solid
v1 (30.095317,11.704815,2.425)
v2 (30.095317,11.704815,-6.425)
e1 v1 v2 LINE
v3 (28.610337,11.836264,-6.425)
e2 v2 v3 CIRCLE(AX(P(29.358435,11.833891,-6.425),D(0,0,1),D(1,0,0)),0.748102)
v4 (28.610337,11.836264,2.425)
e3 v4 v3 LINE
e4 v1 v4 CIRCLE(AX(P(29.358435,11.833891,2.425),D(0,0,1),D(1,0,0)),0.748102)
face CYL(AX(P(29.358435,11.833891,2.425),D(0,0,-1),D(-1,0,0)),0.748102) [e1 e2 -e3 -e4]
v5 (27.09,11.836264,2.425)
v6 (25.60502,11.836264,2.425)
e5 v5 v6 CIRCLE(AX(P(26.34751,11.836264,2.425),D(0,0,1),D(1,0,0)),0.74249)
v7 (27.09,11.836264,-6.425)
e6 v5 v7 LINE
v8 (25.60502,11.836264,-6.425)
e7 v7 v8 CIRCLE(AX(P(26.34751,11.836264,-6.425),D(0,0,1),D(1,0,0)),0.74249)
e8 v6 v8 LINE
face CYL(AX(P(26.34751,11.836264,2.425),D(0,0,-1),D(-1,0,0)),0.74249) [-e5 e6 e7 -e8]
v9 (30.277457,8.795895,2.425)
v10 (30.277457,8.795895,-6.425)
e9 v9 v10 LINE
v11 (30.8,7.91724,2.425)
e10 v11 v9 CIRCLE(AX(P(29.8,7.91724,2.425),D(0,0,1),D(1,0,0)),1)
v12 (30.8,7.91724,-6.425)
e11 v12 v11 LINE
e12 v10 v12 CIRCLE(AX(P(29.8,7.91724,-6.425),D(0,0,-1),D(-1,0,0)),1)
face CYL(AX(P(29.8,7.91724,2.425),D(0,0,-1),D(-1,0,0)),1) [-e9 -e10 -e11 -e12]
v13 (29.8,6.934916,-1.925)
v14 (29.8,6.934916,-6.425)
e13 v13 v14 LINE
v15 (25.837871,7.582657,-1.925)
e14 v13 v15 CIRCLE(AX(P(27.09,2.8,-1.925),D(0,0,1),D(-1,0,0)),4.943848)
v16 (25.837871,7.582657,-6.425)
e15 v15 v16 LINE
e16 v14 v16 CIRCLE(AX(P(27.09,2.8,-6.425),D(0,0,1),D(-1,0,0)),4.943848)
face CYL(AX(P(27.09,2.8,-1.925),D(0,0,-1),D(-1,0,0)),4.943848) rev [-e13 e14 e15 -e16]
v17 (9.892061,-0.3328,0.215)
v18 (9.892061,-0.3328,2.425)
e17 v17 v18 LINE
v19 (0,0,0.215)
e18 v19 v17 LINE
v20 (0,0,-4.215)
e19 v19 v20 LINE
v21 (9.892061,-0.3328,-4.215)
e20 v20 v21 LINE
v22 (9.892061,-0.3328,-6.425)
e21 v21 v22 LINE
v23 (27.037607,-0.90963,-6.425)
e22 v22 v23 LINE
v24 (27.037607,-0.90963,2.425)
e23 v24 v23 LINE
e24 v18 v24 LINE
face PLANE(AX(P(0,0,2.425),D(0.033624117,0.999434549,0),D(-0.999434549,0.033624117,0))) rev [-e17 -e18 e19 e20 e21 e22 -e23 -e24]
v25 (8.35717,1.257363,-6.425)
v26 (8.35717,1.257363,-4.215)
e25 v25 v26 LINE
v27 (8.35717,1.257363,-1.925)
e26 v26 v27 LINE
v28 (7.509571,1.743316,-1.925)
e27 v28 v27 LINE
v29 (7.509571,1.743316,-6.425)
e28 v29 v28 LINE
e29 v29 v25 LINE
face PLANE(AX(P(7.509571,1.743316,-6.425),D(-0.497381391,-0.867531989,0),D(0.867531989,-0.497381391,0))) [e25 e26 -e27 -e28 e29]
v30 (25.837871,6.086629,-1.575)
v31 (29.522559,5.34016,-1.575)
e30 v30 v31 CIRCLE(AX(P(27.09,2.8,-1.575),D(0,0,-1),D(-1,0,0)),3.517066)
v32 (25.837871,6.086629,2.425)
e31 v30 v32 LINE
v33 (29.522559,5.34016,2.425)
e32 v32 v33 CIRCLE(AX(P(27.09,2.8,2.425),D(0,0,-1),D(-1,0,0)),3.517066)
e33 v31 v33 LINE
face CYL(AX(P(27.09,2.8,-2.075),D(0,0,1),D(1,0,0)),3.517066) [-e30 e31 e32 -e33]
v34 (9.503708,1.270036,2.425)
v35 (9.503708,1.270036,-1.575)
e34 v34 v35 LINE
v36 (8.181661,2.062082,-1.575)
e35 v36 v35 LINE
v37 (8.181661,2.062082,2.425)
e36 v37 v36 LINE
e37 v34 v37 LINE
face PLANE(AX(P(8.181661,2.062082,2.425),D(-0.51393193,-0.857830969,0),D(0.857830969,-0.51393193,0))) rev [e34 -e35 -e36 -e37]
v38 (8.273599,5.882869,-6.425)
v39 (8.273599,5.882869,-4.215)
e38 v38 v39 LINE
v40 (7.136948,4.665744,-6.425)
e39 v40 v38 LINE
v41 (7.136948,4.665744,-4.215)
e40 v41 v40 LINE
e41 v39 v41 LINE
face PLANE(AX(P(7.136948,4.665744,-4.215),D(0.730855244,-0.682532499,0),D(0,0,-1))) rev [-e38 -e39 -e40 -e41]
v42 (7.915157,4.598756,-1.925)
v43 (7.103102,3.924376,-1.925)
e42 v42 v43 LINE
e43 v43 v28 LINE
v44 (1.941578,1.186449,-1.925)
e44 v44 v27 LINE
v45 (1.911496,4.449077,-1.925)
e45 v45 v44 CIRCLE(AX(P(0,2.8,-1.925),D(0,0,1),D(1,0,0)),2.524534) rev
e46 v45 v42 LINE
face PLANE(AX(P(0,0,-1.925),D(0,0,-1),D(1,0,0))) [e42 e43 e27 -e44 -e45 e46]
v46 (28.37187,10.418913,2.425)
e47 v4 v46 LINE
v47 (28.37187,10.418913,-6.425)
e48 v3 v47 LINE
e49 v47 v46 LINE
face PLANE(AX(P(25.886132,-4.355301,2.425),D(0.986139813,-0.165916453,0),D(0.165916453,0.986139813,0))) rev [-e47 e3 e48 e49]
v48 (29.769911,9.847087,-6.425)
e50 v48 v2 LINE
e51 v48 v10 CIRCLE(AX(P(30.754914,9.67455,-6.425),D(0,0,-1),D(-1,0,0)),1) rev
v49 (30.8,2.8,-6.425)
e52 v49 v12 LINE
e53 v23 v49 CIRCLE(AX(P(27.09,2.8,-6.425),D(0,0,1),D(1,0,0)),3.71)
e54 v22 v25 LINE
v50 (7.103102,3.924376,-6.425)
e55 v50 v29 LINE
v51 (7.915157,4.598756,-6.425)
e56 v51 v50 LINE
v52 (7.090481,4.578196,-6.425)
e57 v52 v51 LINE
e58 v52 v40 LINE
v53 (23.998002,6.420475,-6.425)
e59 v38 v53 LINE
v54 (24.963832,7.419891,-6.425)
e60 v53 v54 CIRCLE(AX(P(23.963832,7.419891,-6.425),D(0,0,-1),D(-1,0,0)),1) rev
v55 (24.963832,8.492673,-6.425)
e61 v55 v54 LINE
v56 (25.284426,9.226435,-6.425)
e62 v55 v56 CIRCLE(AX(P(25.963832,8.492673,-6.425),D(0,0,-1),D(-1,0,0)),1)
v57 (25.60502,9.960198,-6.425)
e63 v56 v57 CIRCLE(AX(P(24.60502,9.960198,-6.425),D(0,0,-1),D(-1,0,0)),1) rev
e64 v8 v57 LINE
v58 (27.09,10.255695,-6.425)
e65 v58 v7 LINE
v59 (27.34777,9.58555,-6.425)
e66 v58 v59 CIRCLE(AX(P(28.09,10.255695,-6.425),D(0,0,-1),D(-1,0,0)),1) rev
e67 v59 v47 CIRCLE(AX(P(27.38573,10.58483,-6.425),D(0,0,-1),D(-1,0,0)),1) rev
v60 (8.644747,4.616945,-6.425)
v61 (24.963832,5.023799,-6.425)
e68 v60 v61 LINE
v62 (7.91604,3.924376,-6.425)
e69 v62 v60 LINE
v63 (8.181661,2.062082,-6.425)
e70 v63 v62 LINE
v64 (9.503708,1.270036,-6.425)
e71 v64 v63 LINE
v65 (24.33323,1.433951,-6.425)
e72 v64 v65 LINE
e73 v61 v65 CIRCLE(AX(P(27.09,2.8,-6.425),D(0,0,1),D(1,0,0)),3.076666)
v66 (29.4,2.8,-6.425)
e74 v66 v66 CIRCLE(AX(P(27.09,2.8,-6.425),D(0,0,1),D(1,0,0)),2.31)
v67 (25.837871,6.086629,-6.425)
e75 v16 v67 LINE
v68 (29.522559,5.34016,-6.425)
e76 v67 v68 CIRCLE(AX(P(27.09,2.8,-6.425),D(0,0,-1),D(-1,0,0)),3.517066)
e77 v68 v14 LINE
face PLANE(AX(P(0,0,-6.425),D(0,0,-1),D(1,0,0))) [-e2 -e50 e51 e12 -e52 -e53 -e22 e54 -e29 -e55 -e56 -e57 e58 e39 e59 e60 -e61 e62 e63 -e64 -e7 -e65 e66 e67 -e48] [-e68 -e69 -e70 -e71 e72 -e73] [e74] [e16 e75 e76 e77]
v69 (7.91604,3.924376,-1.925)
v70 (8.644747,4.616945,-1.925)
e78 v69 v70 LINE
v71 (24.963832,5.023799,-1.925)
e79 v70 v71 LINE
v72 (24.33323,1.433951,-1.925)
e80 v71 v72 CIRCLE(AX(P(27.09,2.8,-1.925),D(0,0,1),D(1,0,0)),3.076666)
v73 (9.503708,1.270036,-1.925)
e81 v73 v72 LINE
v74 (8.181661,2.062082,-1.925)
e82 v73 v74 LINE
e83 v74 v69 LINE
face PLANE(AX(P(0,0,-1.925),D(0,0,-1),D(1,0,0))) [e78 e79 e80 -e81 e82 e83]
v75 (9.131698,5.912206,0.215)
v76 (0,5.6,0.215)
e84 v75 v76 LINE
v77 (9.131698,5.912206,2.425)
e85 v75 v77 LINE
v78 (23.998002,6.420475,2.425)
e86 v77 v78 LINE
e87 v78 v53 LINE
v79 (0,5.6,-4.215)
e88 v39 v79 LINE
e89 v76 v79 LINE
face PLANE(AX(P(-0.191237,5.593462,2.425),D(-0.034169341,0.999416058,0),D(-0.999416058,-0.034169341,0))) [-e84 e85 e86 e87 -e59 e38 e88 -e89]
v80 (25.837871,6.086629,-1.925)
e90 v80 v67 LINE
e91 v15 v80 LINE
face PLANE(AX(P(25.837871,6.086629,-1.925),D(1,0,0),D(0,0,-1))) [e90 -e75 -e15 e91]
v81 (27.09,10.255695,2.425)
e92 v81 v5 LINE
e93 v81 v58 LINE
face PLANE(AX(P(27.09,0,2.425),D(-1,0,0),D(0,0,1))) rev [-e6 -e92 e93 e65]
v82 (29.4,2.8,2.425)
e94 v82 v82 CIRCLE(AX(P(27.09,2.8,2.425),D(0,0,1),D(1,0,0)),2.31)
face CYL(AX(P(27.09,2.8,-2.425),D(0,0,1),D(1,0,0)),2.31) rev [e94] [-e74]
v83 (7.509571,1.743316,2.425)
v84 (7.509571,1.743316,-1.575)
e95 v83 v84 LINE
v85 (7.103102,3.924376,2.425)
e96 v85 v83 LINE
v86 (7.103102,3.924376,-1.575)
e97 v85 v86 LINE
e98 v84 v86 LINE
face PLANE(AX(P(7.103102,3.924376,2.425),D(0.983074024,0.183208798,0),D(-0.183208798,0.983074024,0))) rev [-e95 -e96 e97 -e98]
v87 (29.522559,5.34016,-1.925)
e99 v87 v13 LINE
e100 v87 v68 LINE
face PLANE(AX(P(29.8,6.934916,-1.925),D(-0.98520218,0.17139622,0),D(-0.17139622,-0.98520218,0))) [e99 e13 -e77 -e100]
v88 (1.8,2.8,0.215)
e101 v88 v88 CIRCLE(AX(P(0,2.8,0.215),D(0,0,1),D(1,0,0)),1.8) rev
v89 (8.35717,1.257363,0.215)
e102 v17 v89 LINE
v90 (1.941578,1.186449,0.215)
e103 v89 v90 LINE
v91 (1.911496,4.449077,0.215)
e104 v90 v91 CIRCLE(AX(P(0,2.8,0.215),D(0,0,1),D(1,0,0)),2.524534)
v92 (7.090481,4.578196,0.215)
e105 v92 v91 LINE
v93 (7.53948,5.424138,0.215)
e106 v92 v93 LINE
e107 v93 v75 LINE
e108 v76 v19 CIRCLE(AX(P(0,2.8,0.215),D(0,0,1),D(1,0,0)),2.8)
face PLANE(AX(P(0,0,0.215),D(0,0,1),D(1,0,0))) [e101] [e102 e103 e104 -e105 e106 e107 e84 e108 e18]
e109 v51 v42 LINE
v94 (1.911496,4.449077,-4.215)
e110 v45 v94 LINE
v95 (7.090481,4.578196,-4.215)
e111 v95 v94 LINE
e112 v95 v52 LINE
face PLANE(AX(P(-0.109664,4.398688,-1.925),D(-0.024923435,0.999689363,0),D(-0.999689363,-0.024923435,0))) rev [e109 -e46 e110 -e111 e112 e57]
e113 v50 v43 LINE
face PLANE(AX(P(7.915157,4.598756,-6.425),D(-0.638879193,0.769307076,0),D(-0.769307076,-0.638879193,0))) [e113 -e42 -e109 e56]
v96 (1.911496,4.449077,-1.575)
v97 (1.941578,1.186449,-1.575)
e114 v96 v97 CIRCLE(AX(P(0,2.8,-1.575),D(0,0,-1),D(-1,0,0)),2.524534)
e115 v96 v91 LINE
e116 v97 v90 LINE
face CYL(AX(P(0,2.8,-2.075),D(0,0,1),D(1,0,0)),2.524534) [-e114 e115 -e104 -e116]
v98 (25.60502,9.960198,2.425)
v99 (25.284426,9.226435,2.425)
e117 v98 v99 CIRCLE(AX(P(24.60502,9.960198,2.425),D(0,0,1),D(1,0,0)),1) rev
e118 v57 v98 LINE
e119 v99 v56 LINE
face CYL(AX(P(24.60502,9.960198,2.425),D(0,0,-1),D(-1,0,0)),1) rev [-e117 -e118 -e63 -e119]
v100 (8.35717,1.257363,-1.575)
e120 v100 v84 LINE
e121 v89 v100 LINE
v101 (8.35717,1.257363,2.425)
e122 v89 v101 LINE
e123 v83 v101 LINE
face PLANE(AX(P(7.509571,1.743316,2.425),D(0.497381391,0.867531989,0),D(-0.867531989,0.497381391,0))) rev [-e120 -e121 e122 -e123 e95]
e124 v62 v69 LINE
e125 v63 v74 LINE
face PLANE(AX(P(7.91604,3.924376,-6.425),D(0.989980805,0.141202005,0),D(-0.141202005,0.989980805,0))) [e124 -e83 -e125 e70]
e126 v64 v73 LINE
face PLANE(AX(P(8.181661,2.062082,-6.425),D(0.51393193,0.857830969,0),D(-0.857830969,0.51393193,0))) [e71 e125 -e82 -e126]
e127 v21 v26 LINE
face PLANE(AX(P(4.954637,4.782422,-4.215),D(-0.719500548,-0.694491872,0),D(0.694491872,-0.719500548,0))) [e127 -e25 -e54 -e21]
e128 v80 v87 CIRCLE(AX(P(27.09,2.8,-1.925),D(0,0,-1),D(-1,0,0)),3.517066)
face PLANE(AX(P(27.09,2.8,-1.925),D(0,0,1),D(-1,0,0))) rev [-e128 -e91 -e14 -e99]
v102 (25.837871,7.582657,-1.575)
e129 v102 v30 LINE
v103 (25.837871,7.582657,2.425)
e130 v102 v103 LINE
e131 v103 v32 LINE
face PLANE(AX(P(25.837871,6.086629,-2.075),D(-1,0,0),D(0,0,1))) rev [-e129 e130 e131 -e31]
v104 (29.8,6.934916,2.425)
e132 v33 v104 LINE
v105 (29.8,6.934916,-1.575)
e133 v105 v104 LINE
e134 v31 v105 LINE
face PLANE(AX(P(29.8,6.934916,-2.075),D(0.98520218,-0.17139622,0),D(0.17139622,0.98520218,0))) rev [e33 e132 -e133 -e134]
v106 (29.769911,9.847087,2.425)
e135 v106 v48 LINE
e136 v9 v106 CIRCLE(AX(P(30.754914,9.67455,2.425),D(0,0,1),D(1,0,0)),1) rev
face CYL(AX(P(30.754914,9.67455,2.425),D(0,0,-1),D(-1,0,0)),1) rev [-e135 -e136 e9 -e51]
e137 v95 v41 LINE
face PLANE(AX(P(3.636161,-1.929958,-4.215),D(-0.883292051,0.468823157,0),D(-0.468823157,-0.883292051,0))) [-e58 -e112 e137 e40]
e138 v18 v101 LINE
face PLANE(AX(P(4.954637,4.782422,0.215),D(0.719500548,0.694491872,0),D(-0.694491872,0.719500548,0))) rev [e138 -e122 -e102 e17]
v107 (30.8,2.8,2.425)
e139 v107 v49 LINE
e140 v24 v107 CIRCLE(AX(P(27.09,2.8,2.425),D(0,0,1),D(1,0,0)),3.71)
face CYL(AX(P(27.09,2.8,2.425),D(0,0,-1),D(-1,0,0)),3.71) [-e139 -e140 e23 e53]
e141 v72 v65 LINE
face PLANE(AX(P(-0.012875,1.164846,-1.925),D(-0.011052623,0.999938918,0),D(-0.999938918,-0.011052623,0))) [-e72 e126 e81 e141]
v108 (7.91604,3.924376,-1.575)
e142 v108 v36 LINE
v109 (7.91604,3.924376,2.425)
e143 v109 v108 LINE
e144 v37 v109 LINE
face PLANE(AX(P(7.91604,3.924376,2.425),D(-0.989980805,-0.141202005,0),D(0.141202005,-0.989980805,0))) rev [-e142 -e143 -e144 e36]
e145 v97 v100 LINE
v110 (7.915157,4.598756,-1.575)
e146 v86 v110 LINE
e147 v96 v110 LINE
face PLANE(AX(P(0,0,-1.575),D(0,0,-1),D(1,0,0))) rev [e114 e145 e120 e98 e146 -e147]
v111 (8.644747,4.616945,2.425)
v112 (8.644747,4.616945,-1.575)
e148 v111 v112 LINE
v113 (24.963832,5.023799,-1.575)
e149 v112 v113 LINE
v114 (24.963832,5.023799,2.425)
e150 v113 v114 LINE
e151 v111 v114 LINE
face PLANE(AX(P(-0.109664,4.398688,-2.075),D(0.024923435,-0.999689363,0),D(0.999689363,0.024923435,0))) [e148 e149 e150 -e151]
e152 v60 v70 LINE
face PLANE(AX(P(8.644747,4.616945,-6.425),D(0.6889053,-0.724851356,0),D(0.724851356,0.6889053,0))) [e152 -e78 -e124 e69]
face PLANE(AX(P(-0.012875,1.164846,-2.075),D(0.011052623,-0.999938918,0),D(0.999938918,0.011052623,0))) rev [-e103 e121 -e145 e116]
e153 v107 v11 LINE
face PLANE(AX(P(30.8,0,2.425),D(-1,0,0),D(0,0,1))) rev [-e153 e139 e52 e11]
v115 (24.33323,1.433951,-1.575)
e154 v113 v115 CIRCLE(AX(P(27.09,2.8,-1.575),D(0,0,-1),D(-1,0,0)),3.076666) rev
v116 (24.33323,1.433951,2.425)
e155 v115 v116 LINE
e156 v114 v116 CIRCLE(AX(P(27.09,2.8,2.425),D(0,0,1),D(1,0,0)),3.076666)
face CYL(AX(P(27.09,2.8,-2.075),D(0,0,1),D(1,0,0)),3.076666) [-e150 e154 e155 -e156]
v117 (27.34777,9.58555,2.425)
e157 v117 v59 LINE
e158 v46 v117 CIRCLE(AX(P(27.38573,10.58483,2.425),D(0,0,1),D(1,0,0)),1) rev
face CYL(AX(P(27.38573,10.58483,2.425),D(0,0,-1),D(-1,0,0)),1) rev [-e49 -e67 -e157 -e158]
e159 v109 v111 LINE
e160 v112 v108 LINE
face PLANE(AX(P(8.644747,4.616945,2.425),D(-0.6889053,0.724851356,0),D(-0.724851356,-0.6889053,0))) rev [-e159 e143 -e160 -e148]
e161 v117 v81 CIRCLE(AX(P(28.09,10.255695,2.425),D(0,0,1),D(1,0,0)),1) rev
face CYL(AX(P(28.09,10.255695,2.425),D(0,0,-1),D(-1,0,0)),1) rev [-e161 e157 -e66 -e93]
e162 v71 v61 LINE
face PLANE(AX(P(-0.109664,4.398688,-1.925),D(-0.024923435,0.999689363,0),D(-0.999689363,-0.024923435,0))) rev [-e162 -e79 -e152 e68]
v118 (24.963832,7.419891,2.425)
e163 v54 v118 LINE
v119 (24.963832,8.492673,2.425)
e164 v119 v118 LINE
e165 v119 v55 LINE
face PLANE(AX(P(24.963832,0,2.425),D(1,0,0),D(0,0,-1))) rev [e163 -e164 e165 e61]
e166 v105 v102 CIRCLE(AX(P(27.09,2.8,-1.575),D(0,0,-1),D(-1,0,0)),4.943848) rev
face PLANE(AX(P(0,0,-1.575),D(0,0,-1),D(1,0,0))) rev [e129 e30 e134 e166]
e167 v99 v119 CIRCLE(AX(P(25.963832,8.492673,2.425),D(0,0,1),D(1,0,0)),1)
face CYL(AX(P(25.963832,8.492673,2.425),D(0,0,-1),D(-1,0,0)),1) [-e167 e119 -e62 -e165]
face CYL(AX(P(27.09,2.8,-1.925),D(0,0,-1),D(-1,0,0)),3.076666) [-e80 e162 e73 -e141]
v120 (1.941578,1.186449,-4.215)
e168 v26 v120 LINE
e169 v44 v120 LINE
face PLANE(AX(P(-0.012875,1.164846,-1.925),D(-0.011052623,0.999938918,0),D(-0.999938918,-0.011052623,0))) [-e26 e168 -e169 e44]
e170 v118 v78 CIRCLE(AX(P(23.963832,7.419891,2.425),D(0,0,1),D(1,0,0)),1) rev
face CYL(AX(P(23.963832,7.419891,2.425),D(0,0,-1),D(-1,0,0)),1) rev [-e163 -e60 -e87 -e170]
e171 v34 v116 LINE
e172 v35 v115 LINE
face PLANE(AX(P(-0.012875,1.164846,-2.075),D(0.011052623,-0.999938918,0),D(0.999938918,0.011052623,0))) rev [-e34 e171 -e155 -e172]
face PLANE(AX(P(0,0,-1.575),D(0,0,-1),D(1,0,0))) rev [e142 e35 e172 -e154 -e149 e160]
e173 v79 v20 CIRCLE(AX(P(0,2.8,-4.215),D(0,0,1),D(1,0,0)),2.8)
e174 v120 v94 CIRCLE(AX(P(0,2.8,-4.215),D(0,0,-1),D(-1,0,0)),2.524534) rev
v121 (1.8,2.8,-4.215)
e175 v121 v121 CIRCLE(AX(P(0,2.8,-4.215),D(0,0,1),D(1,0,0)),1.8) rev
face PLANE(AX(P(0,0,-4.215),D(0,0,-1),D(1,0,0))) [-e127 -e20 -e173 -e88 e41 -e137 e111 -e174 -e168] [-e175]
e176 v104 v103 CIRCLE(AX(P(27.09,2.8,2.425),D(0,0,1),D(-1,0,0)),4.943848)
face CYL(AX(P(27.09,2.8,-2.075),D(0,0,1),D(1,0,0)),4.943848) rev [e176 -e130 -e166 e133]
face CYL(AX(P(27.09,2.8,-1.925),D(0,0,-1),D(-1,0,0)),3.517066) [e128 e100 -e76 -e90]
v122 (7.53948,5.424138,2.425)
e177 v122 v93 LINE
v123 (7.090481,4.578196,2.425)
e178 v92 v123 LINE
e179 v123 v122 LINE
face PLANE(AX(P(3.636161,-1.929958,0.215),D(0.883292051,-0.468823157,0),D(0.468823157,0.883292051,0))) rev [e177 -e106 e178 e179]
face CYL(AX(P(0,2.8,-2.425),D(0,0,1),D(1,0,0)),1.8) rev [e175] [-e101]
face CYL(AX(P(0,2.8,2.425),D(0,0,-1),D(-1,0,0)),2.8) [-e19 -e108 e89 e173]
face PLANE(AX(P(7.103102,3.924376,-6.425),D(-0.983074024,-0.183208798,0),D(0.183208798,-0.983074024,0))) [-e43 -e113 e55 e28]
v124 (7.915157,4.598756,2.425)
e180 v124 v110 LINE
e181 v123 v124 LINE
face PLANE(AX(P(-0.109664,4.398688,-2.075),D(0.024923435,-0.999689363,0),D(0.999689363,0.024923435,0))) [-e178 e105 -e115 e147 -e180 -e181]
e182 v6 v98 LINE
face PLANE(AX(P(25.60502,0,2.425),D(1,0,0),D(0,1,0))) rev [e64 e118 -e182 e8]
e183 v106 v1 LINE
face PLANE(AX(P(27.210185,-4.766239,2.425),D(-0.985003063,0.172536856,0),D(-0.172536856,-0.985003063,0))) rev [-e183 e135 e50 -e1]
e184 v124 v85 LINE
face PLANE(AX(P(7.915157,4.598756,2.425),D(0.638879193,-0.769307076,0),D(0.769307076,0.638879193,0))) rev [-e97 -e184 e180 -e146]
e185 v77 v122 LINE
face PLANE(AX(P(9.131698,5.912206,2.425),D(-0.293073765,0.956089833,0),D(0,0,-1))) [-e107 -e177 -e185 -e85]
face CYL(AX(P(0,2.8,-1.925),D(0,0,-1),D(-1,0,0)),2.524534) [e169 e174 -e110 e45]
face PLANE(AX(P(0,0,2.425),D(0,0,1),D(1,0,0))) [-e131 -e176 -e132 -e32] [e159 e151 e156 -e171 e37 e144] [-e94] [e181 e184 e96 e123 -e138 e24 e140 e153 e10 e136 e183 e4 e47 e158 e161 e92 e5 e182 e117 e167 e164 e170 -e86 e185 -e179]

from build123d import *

# Parameters (mm, degrees)
BOSS_EXTRUDE1_DEPTH = 2.425
SKETCH4_R           = 1.8
CUT_EXTRUDE1_DEPTH  = 4.85
SKETCH5_R           = 2.31
CUT_EXTRUDE2_DEPTH  = 4.85
CUT_EXTRUDE3_DEPTH  = 4.5
CUT_EXTRUDE4_DEPTH  = 4.5
SKETCH9_R           = 1.8
CUT_EXTRUDE5_DEPTH  = 2.21
BOSS_EXTRUDE3_DEPTH = 4.5
MIRROR1_START       = -2.425
MIRROR1_DEPTH       = 0.35
MIRROR1_START_2     = -6.425
MIRROR1_2_OUTLINE_R = 2.31
MIRROR1_2_DEPTH     = 4
MIRROR1_START_3     = -4.215
MIRROR1_3_OUTLINE_R = 1.8
MIRROR1_3_DEPTH     = 1.79
MIRROR1_START_4     = -1.925
MIRROR1_4_DEPTH     = 0.35
FILLET1_R           = 1
FILLET2_R           = 1
FILLET3_START       = -7
FILLET3_DEPTH       = 10
FILLET3_START_2     = -6.425
FILLET3_2_DEPTH     = 8.85
CHAMFER1_SIZE       = 1.358599734
CHAMFER1_SIZE_2     = 0.5


with BuildPart() as part:
    # Sketch1 → Boss-Extrude1 (new, symmetric)
    with BuildSketch(Plane.XY):
        with BuildLine():
            Line((24.963832459, 6.453496101), (0, 5.6))
            ThreePointArc((0, 5.6), (-2.8, 2.8), (0, 0))
            Line((0, 0), (26.892949189, -0.904763282))
            Line((26.892949189, -0.904763282), (27.037607331, -0.909630037))
            ThreePointArc((27.037607331, -0.909630037), (29.694776689, 0.158175176), (30.8, 2.8))
            Line((30.8, 2.8), (30.8, 8.487357946))
            ThreePointArc((30.8, 8.487357946), (30.233700276, 8.818910947), (29.638041523, 9.094253316))
            Line((29.638041523, 9.094253316), (30.095317445, 11.704815446))
            ThreePointArc((30.095317445, 11.704815446), (29.424398151, 12.579078458), (28.61033706, 11.836264178))
            Line((28.61033706, 11.836264178), (28.216646516, 9.496327952))
            ThreePointArc((28.216646516, 9.496327952), (27.655285404, 9.566874672), (27.09, 9.590444787))
            Line((27.09, 9.590444787), (27.09, 11.836264178))
            ThreePointArc((27.09, 11.836264178), (26.347509808, 12.578754371), (25.605019615, 11.836264178))
            Line((25.605019615, 11.836264178), (25.605019615, 9.42608283))
            ThreePointArc((25.605019615, 9.42608283), (25.282256308, 9.345395569), (24.963832459, 9.248996201))
            Line((24.963832459, 9.248996201), (24.963832459, 6.453496101))
        make_face()
    extrude(amount=BOSS_EXTRUDE1_DEPTH, both=True)

    # Sketch4 → Cut-Extrude1 (cut)
    with BuildSketch(Plane.XY.offset(2.425)):
        with Locations((0, 2.8)):
            Circle(SKETCH4_R)
    extrude(amount=-CUT_EXTRUDE1_DEPTH, mode=Mode.SUBTRACT)

    # Sketch5 → Cut-Extrude2 (cut)
    with BuildSketch(Plane.XY.offset(2.425)):
        with Locations((27.09, 2.8)):
            Circle(SKETCH5_R)
    extrude(amount=-CUT_EXTRUDE2_DEPTH, mode=Mode.SUBTRACT)

    # Sketch6 → Cut-Extrude3 (cut)
    with BuildSketch(Plane.XY.offset(2.425)):
        with BuildLine():
            Line((24.963832459, 5.0237994), (1.911495606, 4.449077446))
            ThreePointArc((1.911495606, 4.449077446), (2.524426686, 2.823276198), (1.941578309, 1.186449398))
            Line((1.941578309, 1.186449398), (24.333229734, 1.433950995))
            ThreePointArc((24.333229734, 1.433950995), (24.059732141, 3.332305254), (24.963832459, 5.0237994))
        make_face()
    extrude(amount=-CUT_EXTRUDE3_DEPTH, mode=Mode.SUBTRACT)

    # Sketch8 → Cut-Extrude4 (cut)
    with BuildSketch(Plane.XY.offset(2.425)):
        with BuildLine():
            Line((25.837871482, 6.086629038), (25.837871482, 7.582656824))
            ThreePointArc((25.837871482, 7.582656824), (27.887646092, 7.679077048), (29.8, 6.934916217))
            Line((29.8, 6.934916217), (29.522559256, 5.340159783))
            ThreePointArc((29.522559256, 5.340159783), (27.788325332, 6.247041919), (25.837871482, 6.086629038))
        make_face()
    extrude(amount=-CUT_EXTRUDE4_DEPTH, mode=Mode.SUBTRACT)

    # Sketch9 → Cut-Extrude5 (cut)
    # profile 1 of 2: a face of its own
    with BuildSketch(Plane.XY.offset(2.425)):
        with BuildLine():
            Line((0, 0), (9.892061467, -0.332800019))
            Line((9.892061467, -0.332800019), (8.357170093, 1.257362846))
            Line((8.357170093, 1.257362846), (1.941578309, 1.186449398))
            ThreePointArc((1.941578309, 1.186449398), (2.524426686, 2.823276198), (1.911495606, 4.449077446))
            Line((1.911495606, 4.449077446), (7.090480564, 4.578195651))
            Line((7.090480564, 4.578195651), (7.773891231, 5.865783944))
            Line((7.773891231, 5.865783944), (0, 5.6))
            ThreePointArc((0, 5.6), (-2.8, 2.8), (0, 0))
        make_face()
        with Locations((0, 2.8)):
            Circle(SKETCH9_R, mode=Mode.SUBTRACT)
    # profile 2 of 2: a face of its own
    with BuildSketch(Plane.XY.offset(2.425)):
        with BuildLine():
            Line((1.941578309, 1.186449398), (8.357170093, 1.257362846))
            Line((8.357170093, 1.257362846), (7.887025479, 1.744437384))
            Line((7.887025479, 1.744437384), (7.047687655, 3.249473755))
            Line((7.047687655, 3.249473755), (8.459620317, 4.61232992))
            Line((8.459620317, 4.61232992), (7.090480564, 4.578195651))
            Line((7.090480564, 4.578195651), (1.911495606, 4.449077446))
            ThreePointArc((1.911495606, 4.449077446), (2.524426686, 2.823276198), (1.941578309, 1.186449398))
        make_face()
    extrude(amount=-CUT_EXTRUDE5_DEPTH, mode=Mode.SUBTRACT)

    # Sketch10 → Boss-Extrude3 (add)
    with BuildSketch(Plane.XY.offset(-2.075)):
        Polygon((7.915156926, 4.598755806), (7.103101675, 3.924375939), (7.5095709, 1.743316184), (8.357170093, 1.257362846), (9.503707682, 1.270035867), (8.181661024, 2.062082336), (7.916040126, 3.924375939), (8.644746772, 4.616945341), align=None)
    extrude(amount=BOSS_EXTRUDE3_DEPTH)

    # Mirror1: read off the stored shape, not the designer's step
    # Mirror1 outline → Mirror1 (cut)
    with BuildSketch(Plane.XY.offset(MIRROR1_START)):
        with BuildLine():
            ThreePointArc((24.333229734, 1.433950995), (24.059732141, 3.332305255), (24.963832459, 5.0237994))
            Line((24.963832459, 5.0237994), (8.644746772, 4.616945341))
            Line((8.644746772, 4.616945341), (7.916040126, 3.924375939))
            Line((7.916040126, 3.924375939), (8.181661024, 2.062082336))
            Line((8.181661024, 2.062082336), (9.503707682, 1.270035867))
            Line((9.503707682, 1.270035867), (24.333229734, 1.433950995))
        make_face()
        with BuildLine():
            Line((7.103101675, 3.924375939), (7.915156926, 4.598755806))
            Line((7.915156926, 4.598755806), (1.911495606, 4.449077446))
            ThreePointArc((1.911495606, 4.449077446), (2.524426686, 2.823276198), (1.941578309, 1.186449398))
            Line((1.941578309, 1.186449398), (8.357170093, 1.257362846))
            Line((8.357170093, 1.257362846), (7.5095709, 1.743316184))
            Line((7.5095709, 1.743316184), (7.103101675, 3.924375939))
        make_face()
        with BuildLine():
            Line((25.837871482, 7.582656824), (25.837871482, 6.086629038))
            ThreePointArc((25.837871482, 6.086629038), (27.788325332, 6.247041919), (29.522559256, 5.340159783))
            Line((29.522559256, 5.340159783), (29.8, 6.934916217))
            ThreePointArc((29.8, 6.934916217), (27.887646092, 7.679077048), (25.837871482, 7.582656824))
        make_face()
    extrude(amount=MIRROR1_DEPTH, mode=Mode.SUBTRACT)

    # Mirror1 2 outline → Mirror1 2 (add)
    with BuildSketch(Plane.XY.offset(MIRROR1_START_2)):
        with BuildLine():
            Line((7.090480564, 4.578195651), (7.915156926, 4.598755806))
            Line((7.915156926, 4.598755806), (7.103101675, 3.924375939))
            Line((7.103101675, 3.924375939), (7.5095709, 1.743316184))
            Line((7.5095709, 1.743316184), (8.357170093, 1.257362846))
            Line((8.357170093, 1.257362846), (9.892061467, -0.332800019))
            Line((9.892061467, -0.332800019), (27.037607331, -0.909630037))
            ThreePointArc((27.037607331, -0.909630037), (29.694776689, 0.158175176), (30.8, 2.8))
            Line((30.8, 2.8), (30.8, 8.487357946))
            ThreePointArc((30.8, 8.487357946), (30.233700276, 8.818910947), (29.638041523, 9.094253316))
            Line((29.638041523, 9.094253316), (30.095317445, 11.704815446))
            ThreePointArc((30.095317445, 11.704815446), (29.424398151, 12.579078458), (28.61033706, 11.836264178))
            Line((28.61033706, 11.836264178), (28.216646516, 9.496327952))
            ThreePointArc((28.216646516, 9.496327952), (27.655285404, 9.566874672), (27.09, 9.590444787))
            Line((27.09, 9.590444787), (27.09, 11.836264178))
            ThreePointArc((27.09, 11.836264178), (26.347509807, 12.578754371), (25.605019615, 11.836264178))
            Line((25.605019615, 11.836264178), (25.605019615, 9.42608283))
            ThreePointArc((25.605019615, 9.42608283), (25.282256308, 9.345395569), (24.963832459, 9.248996201))
            Line((24.963832459, 9.248996201), (24.963832459, 6.453496101))
            Line((24.963832459, 6.453496101), (7.773891231, 5.865783944))
            Line((7.773891231, 5.865783944), (7.090480564, 4.578195651))
        make_face()
        with BuildLine():
            Line((8.644746772, 4.616945341), (24.963832459, 5.0237994))
            ThreePointArc((24.963832459, 5.0237994), (24.059732141, 3.332305255), (24.333229734, 1.433950995))
            Line((24.333229734, 1.433950995), (9.503707682, 1.270035867))
            Line((9.503707682, 1.270035867), (8.181661024, 2.062082336))
            Line((8.181661024, 2.062082336), (7.916040126, 3.924375939))
            Line((7.916040126, 3.924375939), (8.644746772, 4.616945341))
        make_face(mode=Mode.SUBTRACT)
        with Locations((27.09, 2.8)):
            Circle(MIRROR1_2_OUTLINE_R, mode=Mode.SUBTRACT)
        with BuildLine():
            ThreePointArc((29.522559256, 5.340159783), (27.788325332, 6.247041919), (25.837871482, 6.086629038))
            Line((25.837871482, 6.086629038), (25.837871482, 7.582656824))
            ThreePointArc((25.837871482, 7.582656824), (27.887646092, 7.679077048), (29.8, 6.934916217))
            Line((29.8, 6.934916217), (29.522559256, 5.340159783))
        make_face(mode=Mode.SUBTRACT)
    extrude(amount=MIRROR1_2_DEPTH)

    # Mirror1 3 outline → Mirror1 3 (add)
    with BuildSketch(Plane.XY.offset(MIRROR1_START_3)):
        with BuildLine():
            Line((1.911495606, 4.449077446), (7.090480564, 4.578195651))
            Line((7.090480564, 4.578195651), (7.773891231, 5.865783944))
            Line((7.773891231, 5.865783944), (0, 5.6))
            ThreePointArc((0, 5.6), (-2.8, 2.8), (0, 0))
            Line((0, 0), (9.892061467, -0.332800019))
            Line((9.892061467, -0.332800019), (8.357170093, 1.257362846))
            Line((8.357170093, 1.257362846), (1.941578309, 1.186449398))
            ThreePointArc((1.941578309, 1.186449398), (2.524426686, 2.823276198), (1.911495606, 4.449077446))
        make_face()
        with Locations((0, 2.8)):
            Circle(MIRROR1_3_OUTLINE_R, mode=Mode.SUBTRACT)
    extrude(amount=MIRROR1_3_DEPTH)

    # Mirror1 4 outline → Mirror1 4 (add)
    with BuildSketch(Plane.XY.offset(MIRROR1_START_4)):
        with BuildLine():
            ThreePointArc((24.333229734, 1.433950995), (24.059732141, 3.332305255), (24.963832459, 5.0237994))
            Line((24.963832459, 5.0237994), (8.644746772, 4.616945341))
            Line((8.644746772, 4.616945341), (7.916040126, 3.924375939))
            Line((7.916040126, 3.924375939), (8.181661024, 2.062082336))
            Line((8.181661024, 2.062082336), (9.503707682, 1.270035867))
            Line((9.503707682, 1.270035867), (24.333229734, 1.433950995))
        make_face()
        with BuildLine():
            Line((7.103101675, 3.924375939), (7.915156926, 4.598755806))
            Line((7.915156926, 4.598755806), (1.911495606, 4.449077446))
            ThreePointArc((1.911495606, 4.449077446), (2.524426686, 2.823276198), (1.941578309, 1.186449398))
            Line((1.941578309, 1.186449398), (8.357170093, 1.257362846))
            Line((8.357170093, 1.257362846), (7.5095709, 1.743316184))
            Line((7.5095709, 1.743316184), (7.103101675, 3.924375939))
        make_face()
        with BuildLine():
            Line((25.837871482, 7.582656824), (25.837871482, 6.086629038))
            ThreePointArc((25.837871482, 6.086629038), (27.788325332, 6.247041919), (29.522559256, 5.340159783))
            Line((29.522559256, 5.340159783), (29.8, 6.934916217))
            ThreePointArc((29.8, 6.934916217), (27.887646092, 7.679077048), (25.837871482, 7.582656824))
        make_face()
    extrude(amount=MIRROR1_4_DEPTH)

    # Fillet1
    fillet1_edges = [part.edges().sort_by_distance(p)[0] for p in [
        (28.216646516, 9.496327952, 0),
    ]]
    fillet(fillet1_edges, radius=FILLET1_R)

    # Fillet2
    # the kernel refuses this fillet: 1 mm, written as the material it adds along each edge
    with BuildSketch(Plane(origin=(29.638041523, 9.094253316, -2.425), x_dir=(0.1725368564682428, 0.9850030625130345, 0), z_dir=(0, 0, 1))) as fillet2_piece_1:
        with BuildLine():
            CenterArc((0.764295599, -1), FILLET2_R, 90, 71.872680982)
            ThreePointArc((-0.186071892, -0.688870393), (-0.08398115, -0.346881002), (0, 0))
            Line((0, 0), (0.764295599, 0))
        make_face()
    extrude(amount=4.85)
    with BuildSketch(Plane(origin=(29.638041523, 9.094253316, -6.425), x_dir=(0.1725368564898844, 0.9850030625092436, 0), z_dir=(0, 0, 1))) as fillet2_piece_2:
        with BuildLine():
            CenterArc((0.764295599, -1), FILLET2_R, 90, 71.872680969)
            ThreePointArc((-0.186071892, -0.688870393), (-0.083981149, -0.346881002), (0, 0))
            Line((0, 0), (0.764295599, 0))
        make_face()
    extrude(amount=4)
    # the kernel refuses this fillet: 1 mm, written as the material it takes off along each edge
    with BuildSketch(Plane(origin=(24.963832459, 9.248996201, -8.315807243), x_dir=(-2.562451628141337e-10, -1.0, -3.5674664740127255e-11), z_dir=(-4.379753308299348e-11, -3.567466472890435e-11, 1.0))) as fillet2_2_piece_1:
        with BuildLine():
            CenterArc((0.756322897, 1), FILLET2_R, 201.027306576, 68.972693439)
            ThreePointArc((-0.177086629, 0.641187156), (-0.096399368, 0.31842385), (0, 0))
            Line((0, 0), (0.756322897, 0))
        make_face()
    extrude(amount=12.631614485, mode=Mode.SUBTRACT)

    # Fillet3: read off the stored shape, not the designer's step
    # Fillet3 outline → Fillet3 (cut)
    with BuildSketch(Plane.XY.offset(FILLET3_START)):
        with BuildLine():
            ThreePointArc((30.8, 8.487357946), (30.545599672, 8.645423109), (30.284476711, 8.7921164))
            ThreePointArc((30.284476711, 8.7921164), (30.661523628, 8.424957074), (30.8, 7.917239595))
            Line((30.8, 7.917239595), (30.8, 8.487357946))
        make_face()
    extrude(amount=FILLET3_DEPTH, mode=Mode.SUBTRACT)

    # Fillet3 2 outline → Fillet3 2 (add)
    with BuildSketch(Plane.XY.offset(FILLET3_START_2)):
        with BuildLine():
            Line((25.605019615, 9.42608283), (25.605019615, 9.960197633))
            ThreePointArc((25.605019615, 9.960197633), (25.521372828, 9.559826818), (25.284426037, 9.226435468))
            ThreePointArc((25.284426037, 9.226435468), (25.435212011, 9.341531609), (25.605019615, 9.42608283))
        make_face()
        with BuildLine():
            Line((24.963832459, 6.453496101), (24.963832459, 7.419891079))
            ThreePointArc((24.963832459, 7.419891079), (24.682918455, 6.724969983), (23.9980018, 6.420475021))
            Line((23.9980018, 6.420475021), (24.963832459, 6.453496101))
        make_face()
        with BuildLine():
            ThreePointArc((27.09, 9.590444787), (27.21890802, 9.589221099), (27.347769579, 9.585550475))
            ThreePointArc((27.347769579, 9.585550475), (27.156664471, 9.89668996), (27.09, 10.255695238))
            Line((27.09, 10.255695238), (27.09, 9.590444787))
        make_face()
    extrude(amount=FILLET3_2_DEPTH)

    # Chamfer1
    # the kernel refuses this chamfer: 1.358599734, 1.358599732, 0.5 mm, written as the material it takes off along each edge
    with BuildSketch(Plane(origin=(7.773891231, 5.865783944, 5.952855504), x_dir=(0.9994160575677593, 0.034169341165982005, 0), z_dir=(0, 0, -1))) as chamfer1_piece_1:
        Polygon((CHAMFER1_SIZE * 0.999999998457, 0), (-CHAMFER1_SIZE_2 * 0.498730899085, CHAMFER1_SIZE_2 * 0.866756880733), (0, 0), align=None)
    extrude(amount=5.737855504, mode=Mode.SUBTRACT)
    with BuildSketch(Plane(origin=(7.773891231, 5.865783944, -9.952855511), x_dir=(0.9994160575667841, 0.03416934119450388, 0), z_dir=(0, 0, 1))) as chamfer1_piece_2:
        Polygon((CHAMFER1_SIZE_2, 0), (-CHAMFER1_SIZE * 0.498730899684, -CHAMFER1_SIZE * 0.866756880764), (0, 0), align=None)
    extrude(amount=5.737855511, mode=Mode.SUBTRACT)


solid = part.part
